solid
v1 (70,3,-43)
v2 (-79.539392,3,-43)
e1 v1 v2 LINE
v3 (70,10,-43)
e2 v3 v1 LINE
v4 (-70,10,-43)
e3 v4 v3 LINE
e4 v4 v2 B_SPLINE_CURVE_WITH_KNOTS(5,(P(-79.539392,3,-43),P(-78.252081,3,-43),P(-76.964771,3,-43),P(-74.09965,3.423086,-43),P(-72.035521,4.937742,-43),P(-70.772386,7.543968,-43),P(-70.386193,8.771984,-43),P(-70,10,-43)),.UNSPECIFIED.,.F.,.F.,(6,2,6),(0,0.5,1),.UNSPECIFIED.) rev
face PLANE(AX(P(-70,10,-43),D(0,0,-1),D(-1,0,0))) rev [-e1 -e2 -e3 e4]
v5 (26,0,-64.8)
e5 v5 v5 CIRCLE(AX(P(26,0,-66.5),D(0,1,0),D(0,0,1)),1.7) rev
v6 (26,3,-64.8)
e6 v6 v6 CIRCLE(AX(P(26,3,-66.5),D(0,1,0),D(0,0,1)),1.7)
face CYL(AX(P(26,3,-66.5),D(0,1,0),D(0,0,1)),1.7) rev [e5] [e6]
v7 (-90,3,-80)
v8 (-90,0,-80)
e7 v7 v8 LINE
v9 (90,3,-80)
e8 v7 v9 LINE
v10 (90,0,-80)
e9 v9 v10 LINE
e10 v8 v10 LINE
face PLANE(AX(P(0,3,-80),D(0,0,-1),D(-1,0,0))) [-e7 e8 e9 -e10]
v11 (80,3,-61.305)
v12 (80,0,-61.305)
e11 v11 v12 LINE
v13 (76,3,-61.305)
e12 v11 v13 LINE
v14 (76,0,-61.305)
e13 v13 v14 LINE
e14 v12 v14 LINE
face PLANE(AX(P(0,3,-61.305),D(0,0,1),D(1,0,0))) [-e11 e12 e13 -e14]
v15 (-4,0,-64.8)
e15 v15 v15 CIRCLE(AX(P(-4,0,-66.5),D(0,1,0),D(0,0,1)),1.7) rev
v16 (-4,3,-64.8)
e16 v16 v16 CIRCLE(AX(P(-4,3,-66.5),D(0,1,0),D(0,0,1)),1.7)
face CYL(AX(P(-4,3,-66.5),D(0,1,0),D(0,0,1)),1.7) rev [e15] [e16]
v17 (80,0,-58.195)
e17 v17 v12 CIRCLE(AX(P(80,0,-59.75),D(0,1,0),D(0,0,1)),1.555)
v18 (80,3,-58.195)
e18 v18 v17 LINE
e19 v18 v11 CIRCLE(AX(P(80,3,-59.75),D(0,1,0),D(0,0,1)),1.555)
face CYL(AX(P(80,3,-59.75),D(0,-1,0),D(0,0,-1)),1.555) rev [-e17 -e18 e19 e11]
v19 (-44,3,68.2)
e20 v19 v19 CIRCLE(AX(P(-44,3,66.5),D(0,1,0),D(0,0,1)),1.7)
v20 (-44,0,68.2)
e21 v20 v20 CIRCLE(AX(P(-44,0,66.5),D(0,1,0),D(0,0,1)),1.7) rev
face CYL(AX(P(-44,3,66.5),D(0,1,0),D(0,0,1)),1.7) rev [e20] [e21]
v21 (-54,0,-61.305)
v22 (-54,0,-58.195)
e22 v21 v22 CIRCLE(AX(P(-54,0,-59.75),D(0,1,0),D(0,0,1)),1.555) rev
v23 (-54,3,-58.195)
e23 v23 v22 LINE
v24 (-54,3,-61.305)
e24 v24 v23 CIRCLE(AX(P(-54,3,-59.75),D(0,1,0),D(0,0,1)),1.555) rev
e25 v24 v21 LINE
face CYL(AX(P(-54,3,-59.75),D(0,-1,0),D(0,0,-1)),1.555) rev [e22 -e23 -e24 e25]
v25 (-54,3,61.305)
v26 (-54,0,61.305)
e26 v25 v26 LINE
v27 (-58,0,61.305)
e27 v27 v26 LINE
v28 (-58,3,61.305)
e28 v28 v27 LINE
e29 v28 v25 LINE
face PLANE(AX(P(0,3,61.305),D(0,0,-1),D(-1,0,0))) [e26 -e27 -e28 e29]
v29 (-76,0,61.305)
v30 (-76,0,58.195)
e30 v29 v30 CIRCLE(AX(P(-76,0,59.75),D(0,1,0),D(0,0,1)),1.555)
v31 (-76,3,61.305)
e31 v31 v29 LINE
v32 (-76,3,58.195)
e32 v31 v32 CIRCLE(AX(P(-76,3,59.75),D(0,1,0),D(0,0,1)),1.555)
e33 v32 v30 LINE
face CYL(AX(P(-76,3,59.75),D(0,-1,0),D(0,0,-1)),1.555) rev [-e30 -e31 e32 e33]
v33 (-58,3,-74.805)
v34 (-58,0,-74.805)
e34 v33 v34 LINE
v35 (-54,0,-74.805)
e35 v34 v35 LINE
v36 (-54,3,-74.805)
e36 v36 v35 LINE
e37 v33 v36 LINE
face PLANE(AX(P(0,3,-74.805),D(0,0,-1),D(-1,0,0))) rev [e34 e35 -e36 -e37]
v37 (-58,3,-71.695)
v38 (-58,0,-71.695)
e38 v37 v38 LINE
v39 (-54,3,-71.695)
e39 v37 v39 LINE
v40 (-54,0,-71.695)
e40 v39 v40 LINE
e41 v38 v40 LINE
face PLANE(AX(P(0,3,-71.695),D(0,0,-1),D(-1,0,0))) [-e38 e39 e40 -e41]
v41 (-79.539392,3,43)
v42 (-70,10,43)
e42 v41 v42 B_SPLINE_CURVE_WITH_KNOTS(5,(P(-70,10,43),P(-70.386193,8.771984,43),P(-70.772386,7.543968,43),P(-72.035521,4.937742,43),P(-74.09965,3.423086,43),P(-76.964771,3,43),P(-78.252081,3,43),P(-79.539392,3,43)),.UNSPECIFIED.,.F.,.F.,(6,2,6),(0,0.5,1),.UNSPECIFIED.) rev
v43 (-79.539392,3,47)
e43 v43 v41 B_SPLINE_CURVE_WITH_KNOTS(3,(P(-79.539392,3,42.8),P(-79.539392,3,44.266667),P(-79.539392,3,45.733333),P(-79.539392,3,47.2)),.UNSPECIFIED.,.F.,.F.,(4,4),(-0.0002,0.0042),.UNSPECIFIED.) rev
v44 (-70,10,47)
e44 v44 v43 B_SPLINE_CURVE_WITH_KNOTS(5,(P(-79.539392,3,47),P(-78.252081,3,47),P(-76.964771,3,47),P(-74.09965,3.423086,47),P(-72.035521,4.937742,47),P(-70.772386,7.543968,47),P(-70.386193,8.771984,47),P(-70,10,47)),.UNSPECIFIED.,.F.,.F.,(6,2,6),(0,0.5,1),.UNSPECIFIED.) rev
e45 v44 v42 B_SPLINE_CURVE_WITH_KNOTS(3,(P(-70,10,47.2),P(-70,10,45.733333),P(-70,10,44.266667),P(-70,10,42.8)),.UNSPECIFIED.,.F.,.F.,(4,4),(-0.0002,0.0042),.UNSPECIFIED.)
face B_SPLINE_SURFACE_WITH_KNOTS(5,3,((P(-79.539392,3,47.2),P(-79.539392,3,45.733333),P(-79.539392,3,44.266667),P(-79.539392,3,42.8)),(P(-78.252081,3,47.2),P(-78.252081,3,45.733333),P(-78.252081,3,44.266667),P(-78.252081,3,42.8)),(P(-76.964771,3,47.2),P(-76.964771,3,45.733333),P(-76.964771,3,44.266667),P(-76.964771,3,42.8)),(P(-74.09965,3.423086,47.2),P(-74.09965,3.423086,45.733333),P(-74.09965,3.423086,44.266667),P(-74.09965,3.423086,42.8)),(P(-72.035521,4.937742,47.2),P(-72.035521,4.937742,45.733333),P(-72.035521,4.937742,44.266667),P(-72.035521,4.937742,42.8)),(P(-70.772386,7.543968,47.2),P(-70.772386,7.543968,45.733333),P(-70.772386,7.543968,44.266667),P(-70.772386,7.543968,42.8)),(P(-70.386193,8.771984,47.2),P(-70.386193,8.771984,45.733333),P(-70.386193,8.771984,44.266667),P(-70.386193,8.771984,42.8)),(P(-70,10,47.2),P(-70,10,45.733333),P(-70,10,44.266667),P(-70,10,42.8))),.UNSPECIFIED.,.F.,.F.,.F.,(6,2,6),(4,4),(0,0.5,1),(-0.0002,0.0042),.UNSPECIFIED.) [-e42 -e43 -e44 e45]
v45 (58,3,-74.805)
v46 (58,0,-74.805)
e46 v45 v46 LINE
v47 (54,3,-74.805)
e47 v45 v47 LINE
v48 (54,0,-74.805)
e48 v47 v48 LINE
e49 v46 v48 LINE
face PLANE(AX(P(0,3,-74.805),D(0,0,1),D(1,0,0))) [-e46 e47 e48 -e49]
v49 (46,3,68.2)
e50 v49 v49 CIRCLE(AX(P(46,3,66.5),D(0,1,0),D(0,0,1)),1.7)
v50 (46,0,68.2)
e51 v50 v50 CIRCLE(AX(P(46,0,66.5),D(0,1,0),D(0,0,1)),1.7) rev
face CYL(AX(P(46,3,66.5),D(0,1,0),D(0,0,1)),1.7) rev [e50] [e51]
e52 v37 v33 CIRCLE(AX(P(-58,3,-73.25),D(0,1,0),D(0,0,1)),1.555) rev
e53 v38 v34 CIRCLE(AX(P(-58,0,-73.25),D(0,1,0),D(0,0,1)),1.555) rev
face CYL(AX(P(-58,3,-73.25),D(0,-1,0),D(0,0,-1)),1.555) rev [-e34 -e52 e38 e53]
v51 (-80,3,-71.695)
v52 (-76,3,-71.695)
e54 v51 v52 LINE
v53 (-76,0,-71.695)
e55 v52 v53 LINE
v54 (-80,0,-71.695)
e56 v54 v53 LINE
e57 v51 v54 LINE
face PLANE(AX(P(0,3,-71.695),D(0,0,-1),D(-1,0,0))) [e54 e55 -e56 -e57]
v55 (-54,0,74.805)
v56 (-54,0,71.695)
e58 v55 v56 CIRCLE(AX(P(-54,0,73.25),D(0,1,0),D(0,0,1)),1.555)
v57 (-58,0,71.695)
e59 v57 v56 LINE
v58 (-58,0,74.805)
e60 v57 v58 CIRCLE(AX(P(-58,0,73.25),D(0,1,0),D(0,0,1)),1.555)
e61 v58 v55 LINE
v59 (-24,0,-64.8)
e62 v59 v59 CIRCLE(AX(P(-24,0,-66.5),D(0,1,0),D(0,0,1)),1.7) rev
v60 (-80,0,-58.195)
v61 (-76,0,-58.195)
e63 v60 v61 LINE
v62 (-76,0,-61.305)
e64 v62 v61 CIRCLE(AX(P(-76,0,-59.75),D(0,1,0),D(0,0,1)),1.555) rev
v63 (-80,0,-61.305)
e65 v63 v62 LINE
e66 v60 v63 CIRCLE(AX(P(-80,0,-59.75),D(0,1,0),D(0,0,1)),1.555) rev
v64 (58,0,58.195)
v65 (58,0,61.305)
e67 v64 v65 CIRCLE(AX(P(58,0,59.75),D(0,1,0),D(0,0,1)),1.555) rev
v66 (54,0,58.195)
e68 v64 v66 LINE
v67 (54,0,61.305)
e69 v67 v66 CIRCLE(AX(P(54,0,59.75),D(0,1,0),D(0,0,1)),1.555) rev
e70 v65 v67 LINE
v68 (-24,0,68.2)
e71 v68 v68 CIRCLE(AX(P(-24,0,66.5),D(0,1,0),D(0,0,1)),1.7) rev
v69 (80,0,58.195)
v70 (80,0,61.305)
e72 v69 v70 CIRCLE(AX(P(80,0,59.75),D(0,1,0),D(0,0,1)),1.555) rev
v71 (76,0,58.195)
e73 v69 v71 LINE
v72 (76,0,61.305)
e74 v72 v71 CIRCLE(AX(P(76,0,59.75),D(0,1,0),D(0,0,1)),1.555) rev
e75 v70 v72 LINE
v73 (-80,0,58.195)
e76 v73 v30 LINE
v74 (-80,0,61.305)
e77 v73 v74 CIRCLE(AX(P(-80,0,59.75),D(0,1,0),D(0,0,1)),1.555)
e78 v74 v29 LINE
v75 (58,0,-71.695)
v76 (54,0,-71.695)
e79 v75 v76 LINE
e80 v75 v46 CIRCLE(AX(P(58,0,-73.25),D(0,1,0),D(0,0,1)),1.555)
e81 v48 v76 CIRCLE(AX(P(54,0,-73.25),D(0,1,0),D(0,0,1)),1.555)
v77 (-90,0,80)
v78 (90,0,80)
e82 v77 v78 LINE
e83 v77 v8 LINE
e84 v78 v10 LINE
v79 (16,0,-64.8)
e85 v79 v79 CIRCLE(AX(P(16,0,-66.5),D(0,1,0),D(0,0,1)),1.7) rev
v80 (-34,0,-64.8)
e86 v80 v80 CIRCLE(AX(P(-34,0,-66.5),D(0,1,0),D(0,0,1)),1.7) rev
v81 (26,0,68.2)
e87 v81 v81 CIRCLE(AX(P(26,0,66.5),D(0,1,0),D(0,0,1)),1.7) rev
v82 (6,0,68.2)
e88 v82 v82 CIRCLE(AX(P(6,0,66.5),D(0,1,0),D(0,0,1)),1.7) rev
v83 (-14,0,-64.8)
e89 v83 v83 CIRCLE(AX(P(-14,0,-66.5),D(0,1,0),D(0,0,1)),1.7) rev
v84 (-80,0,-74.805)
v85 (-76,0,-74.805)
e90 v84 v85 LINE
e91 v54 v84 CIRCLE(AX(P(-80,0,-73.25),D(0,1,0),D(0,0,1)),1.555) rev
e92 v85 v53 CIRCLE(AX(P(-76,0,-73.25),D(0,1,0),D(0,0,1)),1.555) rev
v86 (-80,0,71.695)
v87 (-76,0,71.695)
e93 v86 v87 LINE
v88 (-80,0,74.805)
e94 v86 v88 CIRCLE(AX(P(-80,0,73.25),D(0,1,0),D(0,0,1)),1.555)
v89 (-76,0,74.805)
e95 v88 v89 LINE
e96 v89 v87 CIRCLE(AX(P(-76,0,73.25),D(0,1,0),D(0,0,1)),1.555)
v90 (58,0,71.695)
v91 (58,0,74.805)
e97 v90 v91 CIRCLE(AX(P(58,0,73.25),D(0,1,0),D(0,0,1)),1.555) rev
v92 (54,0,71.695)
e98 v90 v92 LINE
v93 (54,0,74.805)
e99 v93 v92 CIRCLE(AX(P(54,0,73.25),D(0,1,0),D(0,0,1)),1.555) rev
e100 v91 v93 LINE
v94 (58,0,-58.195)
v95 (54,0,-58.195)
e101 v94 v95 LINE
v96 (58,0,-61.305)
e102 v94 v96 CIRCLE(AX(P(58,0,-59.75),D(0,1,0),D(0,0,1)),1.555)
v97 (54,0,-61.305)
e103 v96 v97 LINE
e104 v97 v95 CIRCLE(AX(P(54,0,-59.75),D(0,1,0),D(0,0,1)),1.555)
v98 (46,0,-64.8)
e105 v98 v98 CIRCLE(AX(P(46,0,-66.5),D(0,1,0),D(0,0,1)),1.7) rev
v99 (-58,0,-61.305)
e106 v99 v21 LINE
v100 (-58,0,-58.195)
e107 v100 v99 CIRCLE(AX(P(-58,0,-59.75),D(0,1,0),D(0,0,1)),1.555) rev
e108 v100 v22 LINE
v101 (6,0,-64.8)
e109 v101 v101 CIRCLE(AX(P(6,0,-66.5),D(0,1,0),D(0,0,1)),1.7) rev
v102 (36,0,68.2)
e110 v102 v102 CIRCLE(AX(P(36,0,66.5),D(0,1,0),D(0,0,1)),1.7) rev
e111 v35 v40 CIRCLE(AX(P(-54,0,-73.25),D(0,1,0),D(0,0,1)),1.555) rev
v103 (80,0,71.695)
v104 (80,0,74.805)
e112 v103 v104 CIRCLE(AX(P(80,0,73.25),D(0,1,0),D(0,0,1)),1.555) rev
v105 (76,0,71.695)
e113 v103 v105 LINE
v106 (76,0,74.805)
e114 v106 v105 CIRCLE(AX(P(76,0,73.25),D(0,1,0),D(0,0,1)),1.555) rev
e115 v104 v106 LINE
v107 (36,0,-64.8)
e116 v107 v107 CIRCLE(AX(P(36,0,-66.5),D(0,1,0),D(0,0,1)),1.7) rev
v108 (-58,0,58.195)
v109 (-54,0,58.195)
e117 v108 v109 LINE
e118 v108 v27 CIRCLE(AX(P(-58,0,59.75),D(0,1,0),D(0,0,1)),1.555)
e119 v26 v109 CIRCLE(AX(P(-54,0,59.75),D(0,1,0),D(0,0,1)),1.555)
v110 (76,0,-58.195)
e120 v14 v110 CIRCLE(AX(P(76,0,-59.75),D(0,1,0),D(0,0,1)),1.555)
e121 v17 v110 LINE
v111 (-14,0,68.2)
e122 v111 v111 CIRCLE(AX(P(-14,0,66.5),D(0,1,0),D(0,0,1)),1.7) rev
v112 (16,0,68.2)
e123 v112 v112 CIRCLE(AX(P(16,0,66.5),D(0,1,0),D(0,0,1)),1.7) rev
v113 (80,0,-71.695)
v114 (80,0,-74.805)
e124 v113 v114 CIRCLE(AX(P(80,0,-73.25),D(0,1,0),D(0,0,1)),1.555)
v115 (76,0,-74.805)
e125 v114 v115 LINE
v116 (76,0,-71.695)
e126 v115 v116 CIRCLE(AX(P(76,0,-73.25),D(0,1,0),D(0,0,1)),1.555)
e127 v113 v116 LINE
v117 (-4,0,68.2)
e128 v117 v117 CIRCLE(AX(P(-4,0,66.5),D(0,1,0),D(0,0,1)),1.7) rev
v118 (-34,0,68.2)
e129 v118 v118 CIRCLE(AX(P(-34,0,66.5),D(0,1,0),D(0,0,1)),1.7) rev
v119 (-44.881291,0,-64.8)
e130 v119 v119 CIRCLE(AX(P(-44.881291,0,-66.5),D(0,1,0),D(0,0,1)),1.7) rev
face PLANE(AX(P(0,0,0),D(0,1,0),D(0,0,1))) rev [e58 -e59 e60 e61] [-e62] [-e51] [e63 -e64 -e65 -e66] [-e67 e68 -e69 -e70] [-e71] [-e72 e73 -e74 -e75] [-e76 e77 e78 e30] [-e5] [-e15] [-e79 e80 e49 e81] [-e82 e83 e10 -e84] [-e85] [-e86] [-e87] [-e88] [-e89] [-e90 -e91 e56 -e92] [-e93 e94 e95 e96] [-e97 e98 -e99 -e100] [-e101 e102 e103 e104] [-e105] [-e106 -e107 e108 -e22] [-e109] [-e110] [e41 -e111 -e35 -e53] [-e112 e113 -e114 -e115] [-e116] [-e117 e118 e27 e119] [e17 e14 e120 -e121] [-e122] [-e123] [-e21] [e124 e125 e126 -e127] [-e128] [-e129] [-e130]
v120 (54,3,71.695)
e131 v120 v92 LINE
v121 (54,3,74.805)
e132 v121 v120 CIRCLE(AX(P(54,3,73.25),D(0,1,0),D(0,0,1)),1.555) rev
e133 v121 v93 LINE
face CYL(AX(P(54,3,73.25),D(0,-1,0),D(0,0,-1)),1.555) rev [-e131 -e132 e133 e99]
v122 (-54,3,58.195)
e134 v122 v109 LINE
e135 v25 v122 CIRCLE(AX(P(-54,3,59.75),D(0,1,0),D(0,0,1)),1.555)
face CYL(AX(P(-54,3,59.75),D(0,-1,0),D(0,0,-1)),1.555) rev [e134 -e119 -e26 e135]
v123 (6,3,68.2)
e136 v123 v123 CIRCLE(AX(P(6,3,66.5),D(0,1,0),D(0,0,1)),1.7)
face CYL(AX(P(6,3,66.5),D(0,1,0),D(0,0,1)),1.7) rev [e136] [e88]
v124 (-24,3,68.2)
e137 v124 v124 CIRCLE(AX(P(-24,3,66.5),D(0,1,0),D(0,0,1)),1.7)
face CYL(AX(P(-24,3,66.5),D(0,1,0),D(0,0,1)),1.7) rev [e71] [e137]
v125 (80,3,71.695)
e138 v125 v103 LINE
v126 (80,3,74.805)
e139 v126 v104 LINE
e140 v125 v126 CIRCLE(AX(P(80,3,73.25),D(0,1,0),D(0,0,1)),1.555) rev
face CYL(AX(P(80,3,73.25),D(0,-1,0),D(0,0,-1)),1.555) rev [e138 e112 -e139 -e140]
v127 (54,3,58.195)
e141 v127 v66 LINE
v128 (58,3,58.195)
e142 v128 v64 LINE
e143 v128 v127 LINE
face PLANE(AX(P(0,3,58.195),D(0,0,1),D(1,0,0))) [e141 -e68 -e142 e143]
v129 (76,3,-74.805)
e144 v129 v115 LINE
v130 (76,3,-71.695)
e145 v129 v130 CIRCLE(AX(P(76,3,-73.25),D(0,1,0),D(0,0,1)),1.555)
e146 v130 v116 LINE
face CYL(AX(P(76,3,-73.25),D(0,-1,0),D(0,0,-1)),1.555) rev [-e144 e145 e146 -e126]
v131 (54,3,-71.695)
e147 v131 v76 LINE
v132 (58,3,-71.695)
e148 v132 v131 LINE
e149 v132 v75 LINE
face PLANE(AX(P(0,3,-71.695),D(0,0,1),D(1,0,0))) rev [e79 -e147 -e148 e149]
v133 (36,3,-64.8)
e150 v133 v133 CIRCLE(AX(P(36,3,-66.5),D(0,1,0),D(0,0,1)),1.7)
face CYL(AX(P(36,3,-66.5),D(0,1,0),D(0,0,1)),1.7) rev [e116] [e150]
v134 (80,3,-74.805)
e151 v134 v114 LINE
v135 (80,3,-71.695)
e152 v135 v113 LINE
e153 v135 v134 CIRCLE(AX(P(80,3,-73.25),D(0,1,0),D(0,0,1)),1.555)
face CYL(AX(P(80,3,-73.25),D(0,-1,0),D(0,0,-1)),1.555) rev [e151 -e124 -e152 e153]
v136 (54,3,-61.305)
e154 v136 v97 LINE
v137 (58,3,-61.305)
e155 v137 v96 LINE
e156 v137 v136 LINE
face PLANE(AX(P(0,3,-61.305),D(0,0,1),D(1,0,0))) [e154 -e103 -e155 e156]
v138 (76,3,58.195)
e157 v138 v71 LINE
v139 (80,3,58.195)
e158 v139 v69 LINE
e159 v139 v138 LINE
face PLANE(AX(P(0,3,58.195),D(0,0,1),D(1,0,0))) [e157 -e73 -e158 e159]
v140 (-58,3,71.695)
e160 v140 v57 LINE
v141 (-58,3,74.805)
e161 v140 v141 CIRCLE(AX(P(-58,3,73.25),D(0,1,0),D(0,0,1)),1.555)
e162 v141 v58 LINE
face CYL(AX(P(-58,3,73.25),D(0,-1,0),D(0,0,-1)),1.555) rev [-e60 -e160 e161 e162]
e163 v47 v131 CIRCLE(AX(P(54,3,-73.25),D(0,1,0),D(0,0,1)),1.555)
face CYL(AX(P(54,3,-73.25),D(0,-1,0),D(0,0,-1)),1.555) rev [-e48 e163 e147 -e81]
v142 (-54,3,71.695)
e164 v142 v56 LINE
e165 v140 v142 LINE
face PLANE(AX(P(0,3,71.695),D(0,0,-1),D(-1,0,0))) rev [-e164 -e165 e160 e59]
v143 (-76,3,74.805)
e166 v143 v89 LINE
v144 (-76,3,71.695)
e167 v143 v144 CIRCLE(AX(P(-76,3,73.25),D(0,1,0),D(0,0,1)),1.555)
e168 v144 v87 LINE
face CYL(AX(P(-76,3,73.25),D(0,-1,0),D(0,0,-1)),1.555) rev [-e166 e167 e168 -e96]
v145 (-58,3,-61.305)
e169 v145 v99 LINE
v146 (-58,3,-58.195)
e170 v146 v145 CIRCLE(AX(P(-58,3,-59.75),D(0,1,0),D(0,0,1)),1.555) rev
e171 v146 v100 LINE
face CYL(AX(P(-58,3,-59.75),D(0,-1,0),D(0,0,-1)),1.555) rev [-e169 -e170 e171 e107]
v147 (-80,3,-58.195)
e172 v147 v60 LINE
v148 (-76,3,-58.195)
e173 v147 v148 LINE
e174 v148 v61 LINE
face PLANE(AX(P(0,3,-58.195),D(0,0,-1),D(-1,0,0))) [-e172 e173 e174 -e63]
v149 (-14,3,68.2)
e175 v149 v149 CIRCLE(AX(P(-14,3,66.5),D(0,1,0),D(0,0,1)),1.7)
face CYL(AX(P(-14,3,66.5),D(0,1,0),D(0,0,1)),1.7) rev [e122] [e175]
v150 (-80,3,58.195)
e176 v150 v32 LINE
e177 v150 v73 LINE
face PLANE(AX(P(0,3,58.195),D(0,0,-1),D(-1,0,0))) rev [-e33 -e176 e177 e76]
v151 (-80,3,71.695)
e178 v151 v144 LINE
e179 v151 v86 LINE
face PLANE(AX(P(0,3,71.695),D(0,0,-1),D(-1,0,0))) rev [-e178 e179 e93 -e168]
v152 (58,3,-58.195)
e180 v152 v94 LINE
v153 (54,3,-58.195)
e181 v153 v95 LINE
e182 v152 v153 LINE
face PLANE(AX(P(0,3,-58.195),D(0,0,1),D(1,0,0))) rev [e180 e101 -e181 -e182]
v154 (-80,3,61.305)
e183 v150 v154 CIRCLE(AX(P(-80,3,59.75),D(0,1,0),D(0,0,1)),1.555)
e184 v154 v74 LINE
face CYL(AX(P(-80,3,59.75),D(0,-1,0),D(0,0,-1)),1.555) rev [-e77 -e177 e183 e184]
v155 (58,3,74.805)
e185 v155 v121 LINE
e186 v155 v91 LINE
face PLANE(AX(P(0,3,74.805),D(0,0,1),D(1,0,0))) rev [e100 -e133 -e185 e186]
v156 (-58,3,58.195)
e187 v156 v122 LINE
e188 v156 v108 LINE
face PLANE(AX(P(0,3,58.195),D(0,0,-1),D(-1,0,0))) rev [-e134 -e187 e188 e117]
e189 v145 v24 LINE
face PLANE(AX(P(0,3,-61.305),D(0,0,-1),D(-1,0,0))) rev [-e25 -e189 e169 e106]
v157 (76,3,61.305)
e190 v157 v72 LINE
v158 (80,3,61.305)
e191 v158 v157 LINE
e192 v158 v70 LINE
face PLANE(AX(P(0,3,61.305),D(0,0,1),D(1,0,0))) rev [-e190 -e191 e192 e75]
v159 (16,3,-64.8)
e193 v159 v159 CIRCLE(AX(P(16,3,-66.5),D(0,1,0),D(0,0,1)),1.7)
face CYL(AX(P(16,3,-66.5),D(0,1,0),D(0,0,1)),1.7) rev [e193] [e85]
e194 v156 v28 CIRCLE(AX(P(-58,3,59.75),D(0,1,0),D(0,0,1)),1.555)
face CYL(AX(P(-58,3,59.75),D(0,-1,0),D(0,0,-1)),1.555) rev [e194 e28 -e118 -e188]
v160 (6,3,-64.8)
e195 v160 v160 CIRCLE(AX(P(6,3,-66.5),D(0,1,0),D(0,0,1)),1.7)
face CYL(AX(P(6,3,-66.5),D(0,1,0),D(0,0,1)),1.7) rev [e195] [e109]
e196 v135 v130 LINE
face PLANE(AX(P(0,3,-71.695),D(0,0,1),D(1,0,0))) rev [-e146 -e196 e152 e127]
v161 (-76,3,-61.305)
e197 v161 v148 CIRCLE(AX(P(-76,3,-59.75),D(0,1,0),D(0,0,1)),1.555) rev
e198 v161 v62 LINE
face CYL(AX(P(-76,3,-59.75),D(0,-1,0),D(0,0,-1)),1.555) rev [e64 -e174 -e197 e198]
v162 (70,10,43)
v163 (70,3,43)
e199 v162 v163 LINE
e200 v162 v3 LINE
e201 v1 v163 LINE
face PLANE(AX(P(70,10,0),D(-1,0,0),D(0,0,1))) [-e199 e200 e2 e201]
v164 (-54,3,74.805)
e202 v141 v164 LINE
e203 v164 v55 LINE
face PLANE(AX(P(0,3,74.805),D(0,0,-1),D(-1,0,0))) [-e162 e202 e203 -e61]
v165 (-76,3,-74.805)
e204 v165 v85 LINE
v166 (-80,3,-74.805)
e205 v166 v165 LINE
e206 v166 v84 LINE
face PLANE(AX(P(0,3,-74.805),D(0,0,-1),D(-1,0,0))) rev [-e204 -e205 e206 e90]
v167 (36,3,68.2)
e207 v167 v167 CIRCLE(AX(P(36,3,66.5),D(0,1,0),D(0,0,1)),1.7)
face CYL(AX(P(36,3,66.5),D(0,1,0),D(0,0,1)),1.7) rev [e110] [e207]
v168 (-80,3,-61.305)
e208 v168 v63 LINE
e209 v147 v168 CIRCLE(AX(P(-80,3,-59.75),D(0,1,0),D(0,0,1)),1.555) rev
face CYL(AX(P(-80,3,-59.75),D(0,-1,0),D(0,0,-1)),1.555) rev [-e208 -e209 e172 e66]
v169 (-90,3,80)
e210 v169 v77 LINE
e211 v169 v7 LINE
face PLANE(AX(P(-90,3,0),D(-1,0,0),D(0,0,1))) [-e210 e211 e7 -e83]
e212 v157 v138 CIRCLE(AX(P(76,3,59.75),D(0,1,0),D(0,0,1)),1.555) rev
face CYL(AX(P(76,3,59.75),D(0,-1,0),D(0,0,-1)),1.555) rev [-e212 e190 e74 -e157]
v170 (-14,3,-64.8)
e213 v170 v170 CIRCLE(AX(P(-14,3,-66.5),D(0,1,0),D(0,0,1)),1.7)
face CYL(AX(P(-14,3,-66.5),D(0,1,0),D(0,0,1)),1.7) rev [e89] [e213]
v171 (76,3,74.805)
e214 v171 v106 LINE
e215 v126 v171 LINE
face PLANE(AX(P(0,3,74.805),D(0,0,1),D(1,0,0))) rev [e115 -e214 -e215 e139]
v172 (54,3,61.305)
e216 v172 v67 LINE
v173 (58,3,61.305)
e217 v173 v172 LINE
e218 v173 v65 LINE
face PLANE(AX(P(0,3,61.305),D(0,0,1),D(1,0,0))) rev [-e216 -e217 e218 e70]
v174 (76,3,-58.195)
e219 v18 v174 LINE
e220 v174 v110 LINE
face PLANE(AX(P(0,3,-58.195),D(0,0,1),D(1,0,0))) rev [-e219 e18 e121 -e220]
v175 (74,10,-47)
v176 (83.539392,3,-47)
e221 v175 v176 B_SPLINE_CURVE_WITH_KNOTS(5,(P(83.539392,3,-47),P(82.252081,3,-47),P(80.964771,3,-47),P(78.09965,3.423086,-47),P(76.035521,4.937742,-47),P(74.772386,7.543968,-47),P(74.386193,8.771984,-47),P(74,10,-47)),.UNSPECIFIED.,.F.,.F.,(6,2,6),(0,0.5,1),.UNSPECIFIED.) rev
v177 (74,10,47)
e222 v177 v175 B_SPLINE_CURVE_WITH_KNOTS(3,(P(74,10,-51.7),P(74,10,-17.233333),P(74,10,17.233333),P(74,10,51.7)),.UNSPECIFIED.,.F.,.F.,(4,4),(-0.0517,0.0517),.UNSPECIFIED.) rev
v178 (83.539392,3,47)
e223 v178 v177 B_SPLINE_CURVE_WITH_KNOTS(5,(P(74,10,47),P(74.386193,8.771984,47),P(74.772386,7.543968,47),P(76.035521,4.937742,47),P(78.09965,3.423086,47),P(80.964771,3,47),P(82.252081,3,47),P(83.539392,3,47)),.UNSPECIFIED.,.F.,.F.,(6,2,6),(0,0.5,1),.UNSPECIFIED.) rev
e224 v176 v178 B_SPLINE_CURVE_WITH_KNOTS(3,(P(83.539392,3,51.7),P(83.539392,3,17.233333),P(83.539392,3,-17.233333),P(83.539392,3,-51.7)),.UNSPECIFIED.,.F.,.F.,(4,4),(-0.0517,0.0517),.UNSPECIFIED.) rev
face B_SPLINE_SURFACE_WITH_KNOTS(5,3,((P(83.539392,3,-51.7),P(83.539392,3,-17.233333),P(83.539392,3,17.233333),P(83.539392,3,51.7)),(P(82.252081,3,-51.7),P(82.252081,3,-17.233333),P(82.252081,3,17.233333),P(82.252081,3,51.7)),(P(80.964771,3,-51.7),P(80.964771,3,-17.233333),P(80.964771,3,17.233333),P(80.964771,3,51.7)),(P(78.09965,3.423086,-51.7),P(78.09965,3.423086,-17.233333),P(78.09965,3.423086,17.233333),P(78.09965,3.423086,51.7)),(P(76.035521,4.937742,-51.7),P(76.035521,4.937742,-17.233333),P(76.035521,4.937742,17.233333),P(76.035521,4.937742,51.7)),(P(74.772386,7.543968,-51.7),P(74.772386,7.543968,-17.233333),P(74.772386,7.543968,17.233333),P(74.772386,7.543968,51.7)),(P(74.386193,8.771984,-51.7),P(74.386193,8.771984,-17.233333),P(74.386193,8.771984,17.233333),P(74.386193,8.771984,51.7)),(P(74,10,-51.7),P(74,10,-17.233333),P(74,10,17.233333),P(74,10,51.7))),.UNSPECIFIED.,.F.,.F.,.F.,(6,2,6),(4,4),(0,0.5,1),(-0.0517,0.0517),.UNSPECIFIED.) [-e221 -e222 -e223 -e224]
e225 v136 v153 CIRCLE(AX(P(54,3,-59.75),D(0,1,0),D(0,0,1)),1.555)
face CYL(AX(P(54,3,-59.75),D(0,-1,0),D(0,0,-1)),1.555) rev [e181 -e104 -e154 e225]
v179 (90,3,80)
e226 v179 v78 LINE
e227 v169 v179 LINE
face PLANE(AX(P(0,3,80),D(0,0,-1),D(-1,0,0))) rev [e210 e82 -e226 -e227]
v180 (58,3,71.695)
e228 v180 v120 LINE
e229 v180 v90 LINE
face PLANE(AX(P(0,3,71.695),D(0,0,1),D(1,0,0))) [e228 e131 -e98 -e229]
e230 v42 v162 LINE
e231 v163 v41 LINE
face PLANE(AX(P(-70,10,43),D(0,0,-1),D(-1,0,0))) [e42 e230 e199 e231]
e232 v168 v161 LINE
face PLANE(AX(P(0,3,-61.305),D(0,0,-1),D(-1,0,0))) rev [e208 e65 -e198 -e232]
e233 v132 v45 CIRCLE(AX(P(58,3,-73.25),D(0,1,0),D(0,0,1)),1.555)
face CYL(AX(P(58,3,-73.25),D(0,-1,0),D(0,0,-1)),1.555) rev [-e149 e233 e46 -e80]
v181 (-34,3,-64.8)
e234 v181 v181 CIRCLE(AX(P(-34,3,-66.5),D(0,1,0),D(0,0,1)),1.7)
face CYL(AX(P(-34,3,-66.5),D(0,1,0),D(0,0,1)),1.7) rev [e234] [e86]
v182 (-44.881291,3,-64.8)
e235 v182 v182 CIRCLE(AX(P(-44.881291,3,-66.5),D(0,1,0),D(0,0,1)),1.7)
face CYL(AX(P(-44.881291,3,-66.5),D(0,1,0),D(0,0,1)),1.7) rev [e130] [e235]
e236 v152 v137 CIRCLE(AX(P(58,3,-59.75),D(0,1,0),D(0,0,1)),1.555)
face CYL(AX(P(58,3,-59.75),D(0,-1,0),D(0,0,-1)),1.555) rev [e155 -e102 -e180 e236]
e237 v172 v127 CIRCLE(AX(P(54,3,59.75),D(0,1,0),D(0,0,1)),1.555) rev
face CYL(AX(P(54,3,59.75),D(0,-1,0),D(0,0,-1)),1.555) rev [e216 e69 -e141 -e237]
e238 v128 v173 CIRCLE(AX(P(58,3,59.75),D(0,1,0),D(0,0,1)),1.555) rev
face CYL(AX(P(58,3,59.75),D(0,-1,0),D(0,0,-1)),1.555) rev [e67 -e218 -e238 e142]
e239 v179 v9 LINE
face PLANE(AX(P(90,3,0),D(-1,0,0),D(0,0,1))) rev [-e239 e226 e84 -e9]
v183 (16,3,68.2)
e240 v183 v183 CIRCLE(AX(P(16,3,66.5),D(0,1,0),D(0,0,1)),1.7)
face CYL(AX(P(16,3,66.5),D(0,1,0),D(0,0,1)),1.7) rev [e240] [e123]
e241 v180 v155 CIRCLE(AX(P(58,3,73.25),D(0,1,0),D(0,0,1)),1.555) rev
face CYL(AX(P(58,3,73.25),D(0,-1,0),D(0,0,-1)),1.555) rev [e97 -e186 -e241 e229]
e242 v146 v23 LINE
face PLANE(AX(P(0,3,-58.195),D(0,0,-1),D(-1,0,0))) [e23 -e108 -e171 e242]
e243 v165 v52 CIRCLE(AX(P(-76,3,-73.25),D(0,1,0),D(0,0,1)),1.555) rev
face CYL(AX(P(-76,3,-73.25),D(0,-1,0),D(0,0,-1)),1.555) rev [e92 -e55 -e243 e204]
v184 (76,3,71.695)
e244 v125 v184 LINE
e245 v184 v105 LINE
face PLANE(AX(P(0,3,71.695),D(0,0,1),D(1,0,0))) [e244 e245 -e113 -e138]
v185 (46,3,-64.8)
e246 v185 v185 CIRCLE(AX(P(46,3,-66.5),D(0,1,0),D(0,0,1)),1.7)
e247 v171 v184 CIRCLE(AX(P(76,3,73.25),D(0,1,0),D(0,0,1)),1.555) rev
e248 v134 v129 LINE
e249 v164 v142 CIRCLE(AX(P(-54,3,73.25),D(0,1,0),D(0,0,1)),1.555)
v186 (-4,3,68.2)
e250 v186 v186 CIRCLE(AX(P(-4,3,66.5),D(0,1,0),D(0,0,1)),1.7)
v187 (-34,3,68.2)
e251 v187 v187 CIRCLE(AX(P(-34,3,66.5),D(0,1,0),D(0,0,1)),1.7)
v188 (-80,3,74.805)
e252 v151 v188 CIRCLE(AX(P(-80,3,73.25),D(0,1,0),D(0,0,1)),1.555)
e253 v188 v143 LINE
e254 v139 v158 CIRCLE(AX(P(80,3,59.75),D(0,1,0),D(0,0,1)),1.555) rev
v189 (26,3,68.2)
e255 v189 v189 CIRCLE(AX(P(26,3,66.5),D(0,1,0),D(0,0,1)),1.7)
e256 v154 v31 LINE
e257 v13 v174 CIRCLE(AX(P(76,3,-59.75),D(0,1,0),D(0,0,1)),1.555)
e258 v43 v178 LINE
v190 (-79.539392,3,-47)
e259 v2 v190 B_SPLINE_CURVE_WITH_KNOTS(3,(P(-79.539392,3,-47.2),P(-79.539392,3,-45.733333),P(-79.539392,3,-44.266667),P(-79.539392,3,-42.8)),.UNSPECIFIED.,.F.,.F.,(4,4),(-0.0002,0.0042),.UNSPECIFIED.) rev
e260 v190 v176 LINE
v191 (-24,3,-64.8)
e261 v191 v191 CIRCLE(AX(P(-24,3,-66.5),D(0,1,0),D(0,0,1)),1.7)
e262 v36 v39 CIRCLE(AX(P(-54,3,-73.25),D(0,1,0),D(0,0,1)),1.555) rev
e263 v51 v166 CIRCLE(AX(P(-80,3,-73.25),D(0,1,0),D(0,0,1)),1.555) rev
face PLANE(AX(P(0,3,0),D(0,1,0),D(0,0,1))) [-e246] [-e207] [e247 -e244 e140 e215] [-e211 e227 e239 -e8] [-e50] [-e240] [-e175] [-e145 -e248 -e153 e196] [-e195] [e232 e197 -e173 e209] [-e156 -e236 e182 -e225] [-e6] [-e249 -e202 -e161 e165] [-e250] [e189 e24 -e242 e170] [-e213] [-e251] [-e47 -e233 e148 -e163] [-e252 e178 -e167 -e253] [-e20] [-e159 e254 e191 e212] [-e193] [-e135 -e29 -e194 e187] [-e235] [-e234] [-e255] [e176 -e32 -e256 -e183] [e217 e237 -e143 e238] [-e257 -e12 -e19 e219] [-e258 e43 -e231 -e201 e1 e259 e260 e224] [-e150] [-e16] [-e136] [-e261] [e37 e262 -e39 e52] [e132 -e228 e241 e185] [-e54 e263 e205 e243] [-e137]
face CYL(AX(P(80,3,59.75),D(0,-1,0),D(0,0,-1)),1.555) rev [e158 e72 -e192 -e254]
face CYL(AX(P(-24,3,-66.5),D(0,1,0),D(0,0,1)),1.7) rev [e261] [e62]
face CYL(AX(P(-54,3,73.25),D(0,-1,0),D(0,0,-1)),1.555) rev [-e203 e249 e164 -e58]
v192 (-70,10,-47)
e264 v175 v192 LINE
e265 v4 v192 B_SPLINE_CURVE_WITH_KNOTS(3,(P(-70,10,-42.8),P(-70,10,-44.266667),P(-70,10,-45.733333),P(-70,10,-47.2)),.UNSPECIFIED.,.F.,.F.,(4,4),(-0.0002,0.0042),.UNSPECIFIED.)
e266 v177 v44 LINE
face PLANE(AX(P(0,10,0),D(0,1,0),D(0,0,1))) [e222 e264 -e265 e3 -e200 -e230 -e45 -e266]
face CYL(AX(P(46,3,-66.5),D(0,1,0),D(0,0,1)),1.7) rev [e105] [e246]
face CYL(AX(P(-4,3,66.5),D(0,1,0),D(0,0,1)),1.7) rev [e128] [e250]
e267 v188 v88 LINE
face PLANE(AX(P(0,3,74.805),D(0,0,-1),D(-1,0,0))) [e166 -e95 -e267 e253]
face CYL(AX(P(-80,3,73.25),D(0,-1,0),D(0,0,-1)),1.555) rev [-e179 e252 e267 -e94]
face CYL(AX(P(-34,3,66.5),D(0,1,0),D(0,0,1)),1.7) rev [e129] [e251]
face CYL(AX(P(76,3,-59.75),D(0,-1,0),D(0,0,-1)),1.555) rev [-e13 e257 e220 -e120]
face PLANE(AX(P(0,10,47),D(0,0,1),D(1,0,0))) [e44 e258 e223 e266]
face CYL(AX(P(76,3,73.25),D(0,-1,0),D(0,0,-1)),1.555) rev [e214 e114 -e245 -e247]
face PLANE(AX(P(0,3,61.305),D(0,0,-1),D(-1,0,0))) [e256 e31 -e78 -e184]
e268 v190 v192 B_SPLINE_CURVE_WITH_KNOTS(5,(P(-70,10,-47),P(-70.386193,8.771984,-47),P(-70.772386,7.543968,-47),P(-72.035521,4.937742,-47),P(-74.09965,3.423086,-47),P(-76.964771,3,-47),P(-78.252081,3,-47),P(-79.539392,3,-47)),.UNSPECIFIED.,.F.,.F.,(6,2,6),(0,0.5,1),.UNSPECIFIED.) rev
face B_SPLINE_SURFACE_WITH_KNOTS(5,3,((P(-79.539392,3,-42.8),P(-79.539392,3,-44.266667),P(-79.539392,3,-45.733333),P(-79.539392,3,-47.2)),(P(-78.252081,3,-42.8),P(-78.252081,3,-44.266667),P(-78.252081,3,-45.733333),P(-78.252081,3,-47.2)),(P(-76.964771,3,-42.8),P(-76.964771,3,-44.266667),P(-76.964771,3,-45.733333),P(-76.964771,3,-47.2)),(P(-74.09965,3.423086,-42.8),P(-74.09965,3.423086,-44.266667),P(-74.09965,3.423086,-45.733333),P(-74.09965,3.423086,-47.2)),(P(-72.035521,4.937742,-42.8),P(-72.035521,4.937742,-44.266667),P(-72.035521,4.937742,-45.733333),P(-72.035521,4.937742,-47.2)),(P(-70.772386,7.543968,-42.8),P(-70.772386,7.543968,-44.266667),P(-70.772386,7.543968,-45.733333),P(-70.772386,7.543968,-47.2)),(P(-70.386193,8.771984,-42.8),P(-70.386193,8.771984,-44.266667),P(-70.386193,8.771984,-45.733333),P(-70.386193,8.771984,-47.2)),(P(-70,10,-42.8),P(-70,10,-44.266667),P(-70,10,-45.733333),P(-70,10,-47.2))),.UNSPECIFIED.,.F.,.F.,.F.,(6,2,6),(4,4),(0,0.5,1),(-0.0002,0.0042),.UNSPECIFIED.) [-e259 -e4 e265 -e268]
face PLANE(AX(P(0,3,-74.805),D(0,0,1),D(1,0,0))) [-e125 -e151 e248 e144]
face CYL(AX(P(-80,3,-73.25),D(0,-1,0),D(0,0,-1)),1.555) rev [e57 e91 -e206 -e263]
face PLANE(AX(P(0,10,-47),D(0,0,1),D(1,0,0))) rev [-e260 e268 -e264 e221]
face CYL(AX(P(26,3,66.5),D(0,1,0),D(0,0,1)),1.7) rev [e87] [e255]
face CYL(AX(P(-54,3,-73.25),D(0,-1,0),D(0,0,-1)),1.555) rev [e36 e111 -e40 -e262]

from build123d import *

# Parameters (mm, degrees)
SKETCH1_W            = 180
SKETCH1_H            = 160
BOSS_EXTRUDE1_DEPTH  = 3
BOSS_EXTRUDE2_DEPTH  = 10
FILLET1_START        = -47
FILLET1_DEPTH        = 94
FILLET1_2_DEPTH      = 4
FILLET1_START_2      = 43
FILLET1_3_DEPTH      = 4
M3_CLEARANCE_HOLE1_D = 3.4


with BuildPart() as part:
    # Sketch1 → Boss-Extrude1 (new body)
    with BuildSketch(Plane(origin=(0, 0, 0), x_dir=(1, 0, 0), z_dir=(0, 1, 0))):
        Rectangle(SKETCH1_W, SKETCH1_H)
        with BuildLine():
            Line((-80, -58.195), (-76, -58.195))
            ThreePointArc((-76, -58.195), (-74.445, -59.75), (-76, -61.305))
            Line((-76, -61.305), (-80, -61.305))
            ThreePointArc((-80, -61.305), (-81.555, -59.75), (-80, -58.195))
        make_face(mode=Mode.SUBTRACT)
        with BuildLine():
            Line((-58, -58.195), (-54, -58.195))
            ThreePointArc((-54, -58.195), (-52.445, -59.75), (-54, -61.305))
            Line((-54, -61.305), (-58, -61.305))
            ThreePointArc((-58, -61.305), (-59.555, -59.75), (-58, -58.195))
        make_face(mode=Mode.SUBTRACT)
        with BuildLine():
            Line((-80, -71.695), (-76, -71.695))
            ThreePointArc((-76, -71.695), (-74.445, -73.25), (-76, -74.805))
            Line((-76, -74.805), (-80, -74.805))
            ThreePointArc((-80, -74.805), (-81.555, -73.25), (-80, -71.695))
        make_face(mode=Mode.SUBTRACT)
        with BuildLine():
            Line((-58, -71.695), (-54, -71.695))
            ThreePointArc((-54, -71.695), (-52.445, -73.25), (-54, -74.805))
            Line((-54, -74.805), (-58, -74.805))
            ThreePointArc((-58, -74.805), (-59.555, -73.25), (-58, -71.695))
        make_face(mode=Mode.SUBTRACT)
        with BuildLine():
            Line((-80, 71.695), (-76, 71.695))
            ThreePointArc((-76, 71.695), (-74.445, 73.25), (-76, 74.805))
            Line((-76, 74.805), (-80, 74.805))
            ThreePointArc((-80, 74.805), (-81.555, 73.25), (-80, 71.695))
        make_face(mode=Mode.SUBTRACT)
        with BuildLine():
            Line((-58, 71.695), (-54, 71.695))
            ThreePointArc((-54, 71.695), (-52.445, 73.25), (-54, 74.805))
            Line((-54, 74.805), (-58, 74.805))
            ThreePointArc((-58, 74.805), (-59.555, 73.25), (-58, 71.695))
        make_face(mode=Mode.SUBTRACT)
        with BuildLine():
            Line((-58, 58.195), (-54, 58.195))
            ThreePointArc((-54, 58.195), (-52.445, 59.75), (-54, 61.305))
            Line((-54, 61.305), (-58, 61.305))
            ThreePointArc((-58, 61.305), (-59.555, 59.75), (-58, 58.195))
        make_face(mode=Mode.SUBTRACT)
        with BuildLine():
            Line((-80, 58.195), (-76, 58.195))
            ThreePointArc((-76, 58.195), (-74.445, 59.75), (-76, 61.305))
            Line((-76, 61.305), (-80, 61.305))
            ThreePointArc((-80, 61.305), (-81.555, 59.75), (-80, 58.195))
        make_face(mode=Mode.SUBTRACT)
        with BuildLine():
            Line((80, -71.695), (76, -71.695))
            ThreePointArc((76, -71.695), (74.445, -73.25), (76, -74.805))
            Line((76, -74.805), (80, -74.805))
            ThreePointArc((80, -74.805), (81.555, -73.25), (80, -71.695))
        make_face(mode=Mode.SUBTRACT)
        with BuildLine():
            Line((80, -58.195), (76, -58.195))
            ThreePointArc((76, -58.195), (74.445, -59.75), (76, -61.305))
            Line((76, -61.305), (80, -61.305))
            ThreePointArc((80, -61.305), (81.555, -59.75), (80, -58.195))
        make_face(mode=Mode.SUBTRACT)
        with BuildLine():
            Line((58, -58.195), (54, -58.195))
            ThreePointArc((54, -58.195), (52.445, -59.75), (54, -61.305))
            Line((54, -61.305), (58, -61.305))
            ThreePointArc((58, -61.305), (59.555, -59.75), (58, -58.195))
        make_face(mode=Mode.SUBTRACT)
        with BuildLine():
            Line((58, -71.695), (54, -71.695))
            ThreePointArc((54, -71.695), (52.445, -73.25), (54, -74.805))
            Line((54, -74.805), (58, -74.805))
            ThreePointArc((58, -74.805), (59.555, -73.25), (58, -71.695))
        make_face(mode=Mode.SUBTRACT)
        with BuildLine():
            Line((80, 58.195), (76, 58.195))
            ThreePointArc((76, 58.195), (74.445, 59.75), (76, 61.305))
            Line((76, 61.305), (80, 61.305))
            ThreePointArc((80, 61.305), (81.555, 59.75), (80, 58.195))
        make_face(mode=Mode.SUBTRACT)
        with BuildLine():
            Line((58, 58.195), (54, 58.195))
            ThreePointArc((54, 58.195), (52.445, 59.75), (54, 61.305))
            Line((54, 61.305), (58, 61.305))
            ThreePointArc((58, 61.305), (59.555, 59.75), (58, 58.195))
        make_face(mode=Mode.SUBTRACT)
        with BuildLine():
            Line((58, 71.695), (54, 71.695))
            ThreePointArc((54, 71.695), (52.445, 73.25), (54, 74.805))
            Line((54, 74.805), (58, 74.805))
            ThreePointArc((58, 74.805), (59.555, 73.25), (58, 71.695))
        make_face(mode=Mode.SUBTRACT)
        with BuildLine():
            Line((80, 71.695), (76, 71.695))
            ThreePointArc((76, 71.695), (74.445, 73.25), (76, 74.805))
            Line((76, 74.805), (80, 74.805))
            ThreePointArc((80, 74.805), (81.555, 73.25), (80, 71.695))
        make_face(mode=Mode.SUBTRACT)
    extrude(amount=BOSS_EXTRUDE1_DEPTH)

    # Sketch1<3> → Boss-Extrude2 (add)
    with BuildSketch(Plane(origin=(0, 0, 0), x_dir=(1, 0, 0), z_dir=(0, 1, 0))):
        Polygon((-70, 47), (-70, 43), (70, 43), (70, -43), (-70, -43), (-70, -47), (74, -47), (74, 47), align=None)
    extrude(amount=BOSS_EXTRUDE2_DEPTH)

    # Fillet1: read off the stored shape, not the designer's step
    # Fillet1 outline → Fillet1 (add)
    with BuildSketch(Plane.XY.offset(FILLET1_START)):
        with BuildLine():
            Line((74, 10), (74, 3))
            Line((74, 3), (83.539392014, 3))
            add(Edge.make_bspline(
                [(83.539392014, 3), (82.252081476, 3), (80.964770938, 3), (78.099649509, 3.423086243), (76.035521304, 4.937742252), (74.772386323, 7.543968027), (74.386193161, 8.771984013), (74, 10)],
                knots=[0, 0, 0, 0, 0, 0, 0.5, 0.5, 1, 1, 1, 1, 1, 1], degree=5))
        make_face()
    extrude(amount=FILLET1_DEPTH)

    # Fillet1 2 outline → Fillet1 2 (add)
    with BuildSketch(Plane.XY.offset(FILLET1_START)):
        with BuildLine():
            add(Edge.make_bspline(
                [(-79.539392014, 3), (-78.252081476, 3), (-76.964770938, 3), (-74.099649509, 3.423086243), (-72.035521304, 4.937742252), (-70.772386323, 7.543968027), (-70.386193161, 8.771984013), (-70, 10)],
                knots=[0, 0, 0, 0, 0, 0, 0.5, 0.5, 1, 1, 1, 1, 1, 1], degree=5))
            Line((-79.539392014, 3), (-70, 3))
            Line((-70, 3), (-70, 10))
        make_face()
    extrude(amount=FILLET1_2_DEPTH)

    # Fillet1 3 outline → Fillet1 3 (add)
    with BuildSketch(Plane.XY.offset(FILLET1_START_2)):
        with BuildLine():
            add(Edge.make_bspline(
                [(-79.539392014, 3), (-78.252081476, 3), (-76.964770938, 3), (-74.099649509, 3.423086243), (-72.035521304, 4.937742252), (-70.772386323, 7.543968027), (-70.386193161, 8.771984013), (-70, 10)],
                knots=[0, 0, 0, 0, 0, 0, 0.5, 0.5, 1, 1, 1, 1, 1, 1], degree=5))
            Line((-79.539392014, 3), (-70, 3))
            Line((-70, 3), (-70, 10))
        make_face()
    extrude(amount=FILLET1_3_DEPTH)

    # M3 Clearance Hole1 (through all)
    with Locations(Plane(origin=(0, 3, 0), x_dir=(1, 0, 0), z_dir=(0, 1, 0))):
        with Locations((-44, -66.5), (-34, -66.5), (-24, -66.5), (-14, -66.5), (-4, -66.5), (6, -66.5), (16, -66.5), (26, -66.5), (36, -66.5), (46, -66.5), (46, 66.5), (36, 66.5), (26, 66.5), (16, 66.5), (6, 66.5), (-4, 66.5), (-14, 66.5), (-24, 66.5), (-34, 66.5), (-44.881291433, 66.5)):
            Hole(M3_CLEARANCE_HOLE1_D / 2)


solid = part.part
